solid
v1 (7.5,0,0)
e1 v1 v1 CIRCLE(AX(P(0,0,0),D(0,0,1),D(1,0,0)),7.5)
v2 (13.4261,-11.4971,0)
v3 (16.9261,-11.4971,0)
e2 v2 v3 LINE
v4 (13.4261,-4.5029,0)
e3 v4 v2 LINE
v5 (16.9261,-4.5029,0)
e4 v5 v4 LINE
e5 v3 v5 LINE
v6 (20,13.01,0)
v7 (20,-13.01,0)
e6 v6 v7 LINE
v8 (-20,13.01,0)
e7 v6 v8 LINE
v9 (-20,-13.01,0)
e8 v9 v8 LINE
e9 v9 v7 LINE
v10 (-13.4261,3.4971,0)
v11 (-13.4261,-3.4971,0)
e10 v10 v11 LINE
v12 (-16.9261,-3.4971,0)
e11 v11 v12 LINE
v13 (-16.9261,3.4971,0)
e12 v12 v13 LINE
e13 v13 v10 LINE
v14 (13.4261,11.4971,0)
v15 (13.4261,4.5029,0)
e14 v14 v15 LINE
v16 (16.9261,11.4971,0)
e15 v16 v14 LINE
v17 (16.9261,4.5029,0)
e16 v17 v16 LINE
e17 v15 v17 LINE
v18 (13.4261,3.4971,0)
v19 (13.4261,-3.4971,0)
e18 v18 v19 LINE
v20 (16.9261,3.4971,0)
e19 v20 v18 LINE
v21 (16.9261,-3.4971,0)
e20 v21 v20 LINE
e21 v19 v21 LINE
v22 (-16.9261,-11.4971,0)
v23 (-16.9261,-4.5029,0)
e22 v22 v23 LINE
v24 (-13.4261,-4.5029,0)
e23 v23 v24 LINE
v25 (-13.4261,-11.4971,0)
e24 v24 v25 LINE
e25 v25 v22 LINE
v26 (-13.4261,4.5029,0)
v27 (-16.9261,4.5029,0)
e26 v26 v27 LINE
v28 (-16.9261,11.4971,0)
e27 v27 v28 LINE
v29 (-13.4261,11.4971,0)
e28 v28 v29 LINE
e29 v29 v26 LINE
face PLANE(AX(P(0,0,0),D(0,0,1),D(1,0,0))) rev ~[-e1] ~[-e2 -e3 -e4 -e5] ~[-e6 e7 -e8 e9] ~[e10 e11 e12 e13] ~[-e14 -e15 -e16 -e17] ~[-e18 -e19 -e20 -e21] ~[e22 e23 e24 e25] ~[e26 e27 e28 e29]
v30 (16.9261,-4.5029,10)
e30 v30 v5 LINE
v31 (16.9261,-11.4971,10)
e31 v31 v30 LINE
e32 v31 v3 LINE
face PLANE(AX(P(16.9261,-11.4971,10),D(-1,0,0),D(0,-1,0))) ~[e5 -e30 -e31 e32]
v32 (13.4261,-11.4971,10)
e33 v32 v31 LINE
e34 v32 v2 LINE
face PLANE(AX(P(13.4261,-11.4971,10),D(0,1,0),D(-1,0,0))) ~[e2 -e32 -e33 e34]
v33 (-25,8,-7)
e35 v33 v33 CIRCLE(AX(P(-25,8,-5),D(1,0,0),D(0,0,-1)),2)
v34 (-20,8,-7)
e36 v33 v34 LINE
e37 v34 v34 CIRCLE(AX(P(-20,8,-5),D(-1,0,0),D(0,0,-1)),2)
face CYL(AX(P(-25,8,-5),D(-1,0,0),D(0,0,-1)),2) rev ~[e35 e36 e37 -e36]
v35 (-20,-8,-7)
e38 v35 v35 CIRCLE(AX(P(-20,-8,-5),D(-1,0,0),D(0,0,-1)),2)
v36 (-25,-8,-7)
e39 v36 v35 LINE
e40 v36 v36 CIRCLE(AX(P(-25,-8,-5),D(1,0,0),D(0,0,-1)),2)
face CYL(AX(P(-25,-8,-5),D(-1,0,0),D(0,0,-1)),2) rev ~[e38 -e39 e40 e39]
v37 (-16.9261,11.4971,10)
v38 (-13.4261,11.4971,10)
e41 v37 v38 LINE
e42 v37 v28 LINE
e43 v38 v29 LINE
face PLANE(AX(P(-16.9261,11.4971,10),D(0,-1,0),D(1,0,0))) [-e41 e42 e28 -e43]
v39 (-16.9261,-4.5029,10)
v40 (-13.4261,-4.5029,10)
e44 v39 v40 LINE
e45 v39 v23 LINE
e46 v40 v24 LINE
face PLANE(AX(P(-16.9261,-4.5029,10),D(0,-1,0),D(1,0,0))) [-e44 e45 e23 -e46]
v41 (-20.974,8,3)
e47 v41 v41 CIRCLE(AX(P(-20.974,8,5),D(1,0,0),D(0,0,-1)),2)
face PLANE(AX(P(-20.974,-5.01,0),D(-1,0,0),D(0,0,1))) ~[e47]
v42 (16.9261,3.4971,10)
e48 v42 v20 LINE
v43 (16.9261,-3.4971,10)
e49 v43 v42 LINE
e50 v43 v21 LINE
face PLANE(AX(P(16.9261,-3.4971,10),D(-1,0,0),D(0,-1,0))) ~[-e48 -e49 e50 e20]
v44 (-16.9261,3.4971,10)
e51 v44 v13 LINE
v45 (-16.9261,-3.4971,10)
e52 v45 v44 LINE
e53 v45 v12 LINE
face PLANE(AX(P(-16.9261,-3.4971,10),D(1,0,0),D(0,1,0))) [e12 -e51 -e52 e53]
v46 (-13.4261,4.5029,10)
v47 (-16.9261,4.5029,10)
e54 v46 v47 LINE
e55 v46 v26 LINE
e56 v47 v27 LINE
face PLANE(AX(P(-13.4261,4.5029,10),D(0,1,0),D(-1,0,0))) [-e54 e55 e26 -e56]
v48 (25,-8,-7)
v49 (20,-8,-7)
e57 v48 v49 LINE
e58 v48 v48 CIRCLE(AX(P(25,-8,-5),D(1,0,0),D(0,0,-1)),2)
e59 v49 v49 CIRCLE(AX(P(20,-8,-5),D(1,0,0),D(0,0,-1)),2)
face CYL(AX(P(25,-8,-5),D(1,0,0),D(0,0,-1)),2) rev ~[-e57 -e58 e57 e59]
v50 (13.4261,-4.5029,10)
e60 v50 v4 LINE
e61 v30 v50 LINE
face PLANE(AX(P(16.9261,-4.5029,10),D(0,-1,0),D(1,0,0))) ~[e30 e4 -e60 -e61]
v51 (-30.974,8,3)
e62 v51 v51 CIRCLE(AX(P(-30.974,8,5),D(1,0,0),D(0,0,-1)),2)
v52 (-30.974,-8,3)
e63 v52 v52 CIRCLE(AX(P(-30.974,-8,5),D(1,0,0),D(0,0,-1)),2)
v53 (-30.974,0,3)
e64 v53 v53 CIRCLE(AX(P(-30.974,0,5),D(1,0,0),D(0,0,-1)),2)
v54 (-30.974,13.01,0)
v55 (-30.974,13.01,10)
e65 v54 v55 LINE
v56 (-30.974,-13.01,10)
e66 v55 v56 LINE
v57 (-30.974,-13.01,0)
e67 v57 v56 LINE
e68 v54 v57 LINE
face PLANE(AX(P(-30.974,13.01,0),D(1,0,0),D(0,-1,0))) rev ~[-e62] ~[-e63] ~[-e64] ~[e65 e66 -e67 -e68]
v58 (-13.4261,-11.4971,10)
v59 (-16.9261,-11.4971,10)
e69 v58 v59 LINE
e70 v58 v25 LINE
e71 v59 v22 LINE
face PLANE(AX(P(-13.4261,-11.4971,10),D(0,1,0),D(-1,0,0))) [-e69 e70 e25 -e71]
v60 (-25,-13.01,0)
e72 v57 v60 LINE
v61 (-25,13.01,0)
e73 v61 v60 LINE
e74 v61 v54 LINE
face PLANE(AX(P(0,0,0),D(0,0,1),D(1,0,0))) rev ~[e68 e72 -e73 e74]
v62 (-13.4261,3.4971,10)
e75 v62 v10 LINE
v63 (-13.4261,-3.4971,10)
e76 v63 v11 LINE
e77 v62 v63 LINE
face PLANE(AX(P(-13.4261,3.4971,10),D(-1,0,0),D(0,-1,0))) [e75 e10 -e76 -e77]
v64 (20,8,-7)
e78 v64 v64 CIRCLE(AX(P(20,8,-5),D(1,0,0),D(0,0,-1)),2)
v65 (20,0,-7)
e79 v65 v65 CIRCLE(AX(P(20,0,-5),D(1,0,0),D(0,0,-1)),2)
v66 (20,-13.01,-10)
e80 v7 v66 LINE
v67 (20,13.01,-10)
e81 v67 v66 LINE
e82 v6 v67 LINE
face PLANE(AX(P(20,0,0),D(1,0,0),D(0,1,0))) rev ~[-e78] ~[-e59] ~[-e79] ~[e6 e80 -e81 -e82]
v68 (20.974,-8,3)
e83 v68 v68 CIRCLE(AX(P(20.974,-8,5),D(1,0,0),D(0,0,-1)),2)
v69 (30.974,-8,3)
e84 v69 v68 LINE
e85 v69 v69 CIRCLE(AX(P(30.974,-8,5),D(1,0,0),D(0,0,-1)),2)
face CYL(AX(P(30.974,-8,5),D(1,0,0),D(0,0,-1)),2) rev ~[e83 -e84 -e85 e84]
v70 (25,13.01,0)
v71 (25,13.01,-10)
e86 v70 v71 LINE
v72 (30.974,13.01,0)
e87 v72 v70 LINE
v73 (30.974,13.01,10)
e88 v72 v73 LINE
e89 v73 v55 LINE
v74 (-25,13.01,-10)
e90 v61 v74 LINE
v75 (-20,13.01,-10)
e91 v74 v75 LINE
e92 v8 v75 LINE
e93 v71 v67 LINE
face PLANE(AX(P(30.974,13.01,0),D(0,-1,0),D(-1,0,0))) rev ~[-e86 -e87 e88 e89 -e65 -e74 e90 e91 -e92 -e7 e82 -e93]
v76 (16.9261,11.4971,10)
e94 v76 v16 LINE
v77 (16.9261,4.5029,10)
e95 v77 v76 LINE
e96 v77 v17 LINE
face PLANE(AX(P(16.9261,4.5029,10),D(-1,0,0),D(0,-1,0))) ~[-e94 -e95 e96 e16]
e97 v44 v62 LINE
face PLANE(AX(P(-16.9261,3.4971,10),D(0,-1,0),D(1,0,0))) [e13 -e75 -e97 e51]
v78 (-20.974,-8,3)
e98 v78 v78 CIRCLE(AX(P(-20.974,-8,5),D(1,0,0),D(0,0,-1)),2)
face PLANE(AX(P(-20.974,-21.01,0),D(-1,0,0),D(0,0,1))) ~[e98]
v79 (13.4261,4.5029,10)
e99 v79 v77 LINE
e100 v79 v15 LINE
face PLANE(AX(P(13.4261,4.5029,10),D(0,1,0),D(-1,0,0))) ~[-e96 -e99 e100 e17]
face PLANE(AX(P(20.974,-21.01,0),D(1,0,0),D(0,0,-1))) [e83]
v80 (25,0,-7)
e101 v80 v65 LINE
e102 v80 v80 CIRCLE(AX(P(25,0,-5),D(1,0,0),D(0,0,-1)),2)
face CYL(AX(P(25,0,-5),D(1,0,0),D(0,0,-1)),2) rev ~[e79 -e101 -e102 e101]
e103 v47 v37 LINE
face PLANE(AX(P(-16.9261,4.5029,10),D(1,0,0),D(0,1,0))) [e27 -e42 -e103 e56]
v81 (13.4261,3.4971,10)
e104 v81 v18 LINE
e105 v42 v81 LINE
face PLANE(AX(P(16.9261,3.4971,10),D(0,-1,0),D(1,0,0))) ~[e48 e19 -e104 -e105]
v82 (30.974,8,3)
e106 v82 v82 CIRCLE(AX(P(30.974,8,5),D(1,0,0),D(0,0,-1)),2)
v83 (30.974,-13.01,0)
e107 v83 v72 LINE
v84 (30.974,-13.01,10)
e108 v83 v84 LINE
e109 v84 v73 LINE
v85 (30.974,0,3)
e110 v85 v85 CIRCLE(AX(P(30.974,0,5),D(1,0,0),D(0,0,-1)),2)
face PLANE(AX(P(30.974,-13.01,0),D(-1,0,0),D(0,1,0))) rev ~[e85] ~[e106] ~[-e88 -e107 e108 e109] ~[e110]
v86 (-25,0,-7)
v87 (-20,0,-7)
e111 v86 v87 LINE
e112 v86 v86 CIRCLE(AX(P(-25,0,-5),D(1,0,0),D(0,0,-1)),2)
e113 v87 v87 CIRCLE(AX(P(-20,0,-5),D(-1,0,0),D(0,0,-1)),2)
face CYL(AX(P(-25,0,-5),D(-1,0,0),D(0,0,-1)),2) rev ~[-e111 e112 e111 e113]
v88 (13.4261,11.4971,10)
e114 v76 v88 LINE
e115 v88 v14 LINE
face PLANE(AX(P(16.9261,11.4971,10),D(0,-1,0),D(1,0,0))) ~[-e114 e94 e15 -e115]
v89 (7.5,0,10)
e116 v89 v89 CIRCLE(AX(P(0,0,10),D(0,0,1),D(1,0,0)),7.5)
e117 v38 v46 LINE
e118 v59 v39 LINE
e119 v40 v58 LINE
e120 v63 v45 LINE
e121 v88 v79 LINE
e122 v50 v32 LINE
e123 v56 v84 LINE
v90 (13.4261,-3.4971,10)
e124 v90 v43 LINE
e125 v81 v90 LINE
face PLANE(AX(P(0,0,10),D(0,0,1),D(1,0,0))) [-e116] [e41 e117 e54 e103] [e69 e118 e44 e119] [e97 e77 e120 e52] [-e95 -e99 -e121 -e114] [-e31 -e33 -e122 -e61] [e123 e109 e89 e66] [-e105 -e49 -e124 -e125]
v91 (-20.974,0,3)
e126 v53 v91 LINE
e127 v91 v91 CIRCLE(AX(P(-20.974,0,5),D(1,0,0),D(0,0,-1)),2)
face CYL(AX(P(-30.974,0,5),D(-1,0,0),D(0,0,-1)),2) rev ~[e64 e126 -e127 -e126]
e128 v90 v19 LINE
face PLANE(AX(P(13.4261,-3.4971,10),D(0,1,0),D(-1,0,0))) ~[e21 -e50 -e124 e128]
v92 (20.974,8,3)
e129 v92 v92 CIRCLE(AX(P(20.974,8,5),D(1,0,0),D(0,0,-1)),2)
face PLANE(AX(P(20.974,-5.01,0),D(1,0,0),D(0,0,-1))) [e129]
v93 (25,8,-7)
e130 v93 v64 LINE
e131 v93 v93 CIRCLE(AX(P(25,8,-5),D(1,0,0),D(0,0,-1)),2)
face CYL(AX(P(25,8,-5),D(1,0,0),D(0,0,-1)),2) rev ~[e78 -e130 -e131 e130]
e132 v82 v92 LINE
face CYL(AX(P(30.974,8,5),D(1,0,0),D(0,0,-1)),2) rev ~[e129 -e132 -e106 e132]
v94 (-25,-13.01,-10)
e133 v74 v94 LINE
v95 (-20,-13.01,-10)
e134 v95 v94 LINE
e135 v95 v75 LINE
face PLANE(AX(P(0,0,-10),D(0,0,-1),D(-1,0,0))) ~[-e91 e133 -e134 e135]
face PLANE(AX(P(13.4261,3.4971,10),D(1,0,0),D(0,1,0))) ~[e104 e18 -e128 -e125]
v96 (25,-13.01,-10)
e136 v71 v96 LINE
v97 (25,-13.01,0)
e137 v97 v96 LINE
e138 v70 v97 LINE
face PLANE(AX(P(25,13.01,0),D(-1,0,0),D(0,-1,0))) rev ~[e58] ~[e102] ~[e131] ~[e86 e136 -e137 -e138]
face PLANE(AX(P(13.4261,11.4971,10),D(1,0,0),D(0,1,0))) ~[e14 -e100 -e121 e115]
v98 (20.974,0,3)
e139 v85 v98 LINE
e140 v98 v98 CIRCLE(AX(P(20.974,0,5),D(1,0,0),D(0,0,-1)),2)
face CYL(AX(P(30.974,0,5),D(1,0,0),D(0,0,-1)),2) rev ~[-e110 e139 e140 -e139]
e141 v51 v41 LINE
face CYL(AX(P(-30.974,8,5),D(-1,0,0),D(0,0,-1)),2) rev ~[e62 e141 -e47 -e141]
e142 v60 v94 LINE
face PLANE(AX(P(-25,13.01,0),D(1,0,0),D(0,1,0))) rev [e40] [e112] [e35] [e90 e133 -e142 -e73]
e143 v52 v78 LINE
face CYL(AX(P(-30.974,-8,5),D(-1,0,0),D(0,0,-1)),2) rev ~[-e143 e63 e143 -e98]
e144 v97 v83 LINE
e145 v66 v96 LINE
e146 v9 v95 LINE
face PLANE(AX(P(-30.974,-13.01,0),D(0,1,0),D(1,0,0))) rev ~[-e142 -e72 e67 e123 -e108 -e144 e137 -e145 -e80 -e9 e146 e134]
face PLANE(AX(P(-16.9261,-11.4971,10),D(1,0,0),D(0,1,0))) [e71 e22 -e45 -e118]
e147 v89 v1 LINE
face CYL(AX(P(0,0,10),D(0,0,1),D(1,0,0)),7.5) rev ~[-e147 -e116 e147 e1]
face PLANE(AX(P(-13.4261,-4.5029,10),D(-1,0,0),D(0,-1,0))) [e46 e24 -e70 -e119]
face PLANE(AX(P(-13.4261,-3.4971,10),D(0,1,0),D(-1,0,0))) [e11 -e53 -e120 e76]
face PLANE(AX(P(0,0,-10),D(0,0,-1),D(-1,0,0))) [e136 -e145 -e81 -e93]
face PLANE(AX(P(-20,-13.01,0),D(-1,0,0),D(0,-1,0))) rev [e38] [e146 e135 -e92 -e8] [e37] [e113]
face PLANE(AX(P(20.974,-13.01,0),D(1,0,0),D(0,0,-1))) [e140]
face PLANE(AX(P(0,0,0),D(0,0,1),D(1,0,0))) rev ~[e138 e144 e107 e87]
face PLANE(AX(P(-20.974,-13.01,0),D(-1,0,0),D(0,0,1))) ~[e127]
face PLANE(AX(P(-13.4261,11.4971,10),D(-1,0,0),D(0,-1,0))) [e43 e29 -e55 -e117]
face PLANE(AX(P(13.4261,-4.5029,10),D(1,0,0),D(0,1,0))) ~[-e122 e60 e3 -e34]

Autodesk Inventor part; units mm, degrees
ref_plane "YZ Plane" through (0, 0, 0) normal (1, 0, 0) x (0, 1, 0)
ref_plane "XZ Plane" through (0, 0, 0) normal (0, 1, 0) x (-1, 0, 0)
ref_plane "XY Plane" through (0, 0, 0) normal (0, 0, 1) x (1, 0, 0)
sketch "Эскиз1" plane through (0, 0, 0) normal (0, 0, 1) x (1, 0, 0)
  line L0 (-30.974, -13.01) -> (30.974, -13.01)
  line L1 (30.974, -13.01) -> (30.974, 13.01)
  line L2 (30.974, 13.01) -> (-30.974, 13.01)
  line L3 (-30.974, 13.01) -> (-30.974, -13.01)
  line L4 (-30.974, -13.01) -> (30.974, 13.01) construction
  line L5 (30.974, -13.01) -> (-30.974, 13.01) construction
  point P0 (0, 0)
  dimension "d0" = 61.948
  dimension "d1" = 26.02
extrude "Выдавливание1" add sketch "Эскиз1" along normal blind 10
sketch "Эскиз2" plane through (30.974, -13.01, 0) normal (1, 0, 0) x (0, 0, -1)
  line L0 (0, 13.01) -> (-5, 13.01)
  circle A0 centre (-5, 13.01) radius 2
  dimension "d4" = 5
  dimension "d5" = 4
extrude "Выдавливание2" cut sketch "Эскиз2" against normal blind 10
pattern_linear "Прямоуг.массив1" count 3 spacing 8 along (0, 1, 0) of "Выдавливание2" first direction both ways yes
mirror "Зеркальное отражение1" about plane through (0, 0, 0) normal (1, 0, 0) of "Выдавливание2", "Прямоуг.массив1"
sketch "Эскиз3" plane through (0, 0, 0) normal (0, 0, -1) x (-1, 0, 0)
  line L0 (0, 0) -> (-20, 0)
  line L1 (-30.974, 13.01) -> (30.974, 13.01) projected
  line L2 (30.974, -13.01) -> (-30.974, -13.01) projected
  line L3 (-20, 13.01) -> (-25, 13.01)
  line L4 (-25, 13.01) -> (-25, -13.01)
  line L5 (-25, -13.01) -> (-20, -13.01)
  line L6 (-20, -13.01) -> (-20, 13.01)
  line L7 (-30.974, -13.01) -> (-30.974, 13.01) projected
  dimension "d11" = 20
  dimension "d12" = 5
extrude "Выдавливание3" add sketch "Эскиз3" along normal blind 10 contours L1 L6 L2 L4
sketch "Эскиз4" plane through (25, -13.01, 0) normal (1, 0, 0) x (0, 0, -1)
  line L0 (10, 26.02) -> (10, 0) projected
  line L1 (10, 13.01) -> (5, 13.01)
  circle A0 centre (5, 13.01) radius 2
  point P0 (0, 13.01)
  dimension "d16" = 5
  dimension "d17" = 4
extrude "Выдавливание4" cut sketch "Эскиз4" against normal blind 10
pattern_linear "Прямоуг.массив2" count 3 spacing 8 along (0, -1, 0) of "Выдавливание4" first direction both ways yes
mirror "Зеркальное отражение2" about plane through (0, 0, 0) normal (1, 0, 0) of "Выдавливание3", "Выдавливание4", "Прямоуг.массив2"
sketch "Эскиз5" plane through (0, 0, 10) normal (0, 0, 1) x (1, 0, 0)
  circle A0 centre (0, 0) radius 7.5
  dimension "d23" = 15
extrude "Выдавливание5" cut sketch "Эскиз5" against normal blind 23.75
sketch "Эскиз6" plane through (0, 0, 10) normal (0, 0, 1) x (1, 0, 0)
  circle A0 centre (0, 0) radius 5
  line L0 (-13.4261, 4.5029) -> (-16.9261, 4.5029)
  line L1 (-16.9261, 4.5029) -> (-16.9261, 11.4971)
  line L2 (-16.9261, 11.4971) -> (-13.4261, 11.4971)
  line L3 (-13.4261, 11.4971) -> (-13.4261, 4.5029)
  line L4 (-13.4261, -11.4971) -> (-16.9261, -11.4971)
  line L5 (-16.9261, -11.4971) -> (-16.9261, -4.5029)
  line L6 (-16.9261, -4.5029) -> (-13.4261, -4.5029)
  line L7 (-13.4261, -4.5029) -> (-13.4261, -11.4971)
  line L8 (-13.4261, -3.4971) -> (-16.9261, -3.4971)
  line L9 (-16.9261, -3.4971) -> (-16.9261, 3.4971)
  line L10 (-16.9261, 3.4971) -> (-13.4261, 3.4971)
  line L11 (-13.4261, 3.4971) -> (-13.4261, -3.4971)
  line L12 (10.5, 4.5029) -> (7, 4.5029)
  line L13 (7, 4.5029) -> (7, 11.4971)
  line L14 (7, 11.4971) -> (10.5, 11.4971)
  line L15 (10.5, 11.4971) -> (10.5, 4.5029)
  line L16 (10.5, -11.4971) -> (7, -11.4971)
  line L17 (7, -11.4971) -> (7, -4.5029)
  line L18 (7, -4.5029) -> (10.5, -4.5029)
  line L19 (10.5, -4.5029) -> (10.5, -11.4971)
  line L20 (7, 3.4971) -> (10.5, 3.4971)
  line L21 (10.5, 3.4971) -> (10.5, -3.4971)
  line L22 (10.5, -3.4971) -> (7, -3.4971)
  line L23 (7, -3.4971) -> (7, 3.4971)
  line L24 (17, -13.1) -> (17, 13.1)
  line L25 (17, 13.1) -> (-17, 13.1)
  line L26 (-17, 13.1) -> (-17, -13.1)
  line L27 (-17, -13.1) -> (17, -13.1)
extrude "Выдавливание6" cut sketch "Эскиз6" against normal blind 10 contours L0 L1 L2 L3 | L4 L5 L6 L7 | L8 L9 L10 L11
mirror "Зеркальное отражение3" about plane through (0, 0, 0) normal (1, 0, 0) of "Выдавливание6"
properties part number "000.404 - Переходник" material "Пластик АБС"
